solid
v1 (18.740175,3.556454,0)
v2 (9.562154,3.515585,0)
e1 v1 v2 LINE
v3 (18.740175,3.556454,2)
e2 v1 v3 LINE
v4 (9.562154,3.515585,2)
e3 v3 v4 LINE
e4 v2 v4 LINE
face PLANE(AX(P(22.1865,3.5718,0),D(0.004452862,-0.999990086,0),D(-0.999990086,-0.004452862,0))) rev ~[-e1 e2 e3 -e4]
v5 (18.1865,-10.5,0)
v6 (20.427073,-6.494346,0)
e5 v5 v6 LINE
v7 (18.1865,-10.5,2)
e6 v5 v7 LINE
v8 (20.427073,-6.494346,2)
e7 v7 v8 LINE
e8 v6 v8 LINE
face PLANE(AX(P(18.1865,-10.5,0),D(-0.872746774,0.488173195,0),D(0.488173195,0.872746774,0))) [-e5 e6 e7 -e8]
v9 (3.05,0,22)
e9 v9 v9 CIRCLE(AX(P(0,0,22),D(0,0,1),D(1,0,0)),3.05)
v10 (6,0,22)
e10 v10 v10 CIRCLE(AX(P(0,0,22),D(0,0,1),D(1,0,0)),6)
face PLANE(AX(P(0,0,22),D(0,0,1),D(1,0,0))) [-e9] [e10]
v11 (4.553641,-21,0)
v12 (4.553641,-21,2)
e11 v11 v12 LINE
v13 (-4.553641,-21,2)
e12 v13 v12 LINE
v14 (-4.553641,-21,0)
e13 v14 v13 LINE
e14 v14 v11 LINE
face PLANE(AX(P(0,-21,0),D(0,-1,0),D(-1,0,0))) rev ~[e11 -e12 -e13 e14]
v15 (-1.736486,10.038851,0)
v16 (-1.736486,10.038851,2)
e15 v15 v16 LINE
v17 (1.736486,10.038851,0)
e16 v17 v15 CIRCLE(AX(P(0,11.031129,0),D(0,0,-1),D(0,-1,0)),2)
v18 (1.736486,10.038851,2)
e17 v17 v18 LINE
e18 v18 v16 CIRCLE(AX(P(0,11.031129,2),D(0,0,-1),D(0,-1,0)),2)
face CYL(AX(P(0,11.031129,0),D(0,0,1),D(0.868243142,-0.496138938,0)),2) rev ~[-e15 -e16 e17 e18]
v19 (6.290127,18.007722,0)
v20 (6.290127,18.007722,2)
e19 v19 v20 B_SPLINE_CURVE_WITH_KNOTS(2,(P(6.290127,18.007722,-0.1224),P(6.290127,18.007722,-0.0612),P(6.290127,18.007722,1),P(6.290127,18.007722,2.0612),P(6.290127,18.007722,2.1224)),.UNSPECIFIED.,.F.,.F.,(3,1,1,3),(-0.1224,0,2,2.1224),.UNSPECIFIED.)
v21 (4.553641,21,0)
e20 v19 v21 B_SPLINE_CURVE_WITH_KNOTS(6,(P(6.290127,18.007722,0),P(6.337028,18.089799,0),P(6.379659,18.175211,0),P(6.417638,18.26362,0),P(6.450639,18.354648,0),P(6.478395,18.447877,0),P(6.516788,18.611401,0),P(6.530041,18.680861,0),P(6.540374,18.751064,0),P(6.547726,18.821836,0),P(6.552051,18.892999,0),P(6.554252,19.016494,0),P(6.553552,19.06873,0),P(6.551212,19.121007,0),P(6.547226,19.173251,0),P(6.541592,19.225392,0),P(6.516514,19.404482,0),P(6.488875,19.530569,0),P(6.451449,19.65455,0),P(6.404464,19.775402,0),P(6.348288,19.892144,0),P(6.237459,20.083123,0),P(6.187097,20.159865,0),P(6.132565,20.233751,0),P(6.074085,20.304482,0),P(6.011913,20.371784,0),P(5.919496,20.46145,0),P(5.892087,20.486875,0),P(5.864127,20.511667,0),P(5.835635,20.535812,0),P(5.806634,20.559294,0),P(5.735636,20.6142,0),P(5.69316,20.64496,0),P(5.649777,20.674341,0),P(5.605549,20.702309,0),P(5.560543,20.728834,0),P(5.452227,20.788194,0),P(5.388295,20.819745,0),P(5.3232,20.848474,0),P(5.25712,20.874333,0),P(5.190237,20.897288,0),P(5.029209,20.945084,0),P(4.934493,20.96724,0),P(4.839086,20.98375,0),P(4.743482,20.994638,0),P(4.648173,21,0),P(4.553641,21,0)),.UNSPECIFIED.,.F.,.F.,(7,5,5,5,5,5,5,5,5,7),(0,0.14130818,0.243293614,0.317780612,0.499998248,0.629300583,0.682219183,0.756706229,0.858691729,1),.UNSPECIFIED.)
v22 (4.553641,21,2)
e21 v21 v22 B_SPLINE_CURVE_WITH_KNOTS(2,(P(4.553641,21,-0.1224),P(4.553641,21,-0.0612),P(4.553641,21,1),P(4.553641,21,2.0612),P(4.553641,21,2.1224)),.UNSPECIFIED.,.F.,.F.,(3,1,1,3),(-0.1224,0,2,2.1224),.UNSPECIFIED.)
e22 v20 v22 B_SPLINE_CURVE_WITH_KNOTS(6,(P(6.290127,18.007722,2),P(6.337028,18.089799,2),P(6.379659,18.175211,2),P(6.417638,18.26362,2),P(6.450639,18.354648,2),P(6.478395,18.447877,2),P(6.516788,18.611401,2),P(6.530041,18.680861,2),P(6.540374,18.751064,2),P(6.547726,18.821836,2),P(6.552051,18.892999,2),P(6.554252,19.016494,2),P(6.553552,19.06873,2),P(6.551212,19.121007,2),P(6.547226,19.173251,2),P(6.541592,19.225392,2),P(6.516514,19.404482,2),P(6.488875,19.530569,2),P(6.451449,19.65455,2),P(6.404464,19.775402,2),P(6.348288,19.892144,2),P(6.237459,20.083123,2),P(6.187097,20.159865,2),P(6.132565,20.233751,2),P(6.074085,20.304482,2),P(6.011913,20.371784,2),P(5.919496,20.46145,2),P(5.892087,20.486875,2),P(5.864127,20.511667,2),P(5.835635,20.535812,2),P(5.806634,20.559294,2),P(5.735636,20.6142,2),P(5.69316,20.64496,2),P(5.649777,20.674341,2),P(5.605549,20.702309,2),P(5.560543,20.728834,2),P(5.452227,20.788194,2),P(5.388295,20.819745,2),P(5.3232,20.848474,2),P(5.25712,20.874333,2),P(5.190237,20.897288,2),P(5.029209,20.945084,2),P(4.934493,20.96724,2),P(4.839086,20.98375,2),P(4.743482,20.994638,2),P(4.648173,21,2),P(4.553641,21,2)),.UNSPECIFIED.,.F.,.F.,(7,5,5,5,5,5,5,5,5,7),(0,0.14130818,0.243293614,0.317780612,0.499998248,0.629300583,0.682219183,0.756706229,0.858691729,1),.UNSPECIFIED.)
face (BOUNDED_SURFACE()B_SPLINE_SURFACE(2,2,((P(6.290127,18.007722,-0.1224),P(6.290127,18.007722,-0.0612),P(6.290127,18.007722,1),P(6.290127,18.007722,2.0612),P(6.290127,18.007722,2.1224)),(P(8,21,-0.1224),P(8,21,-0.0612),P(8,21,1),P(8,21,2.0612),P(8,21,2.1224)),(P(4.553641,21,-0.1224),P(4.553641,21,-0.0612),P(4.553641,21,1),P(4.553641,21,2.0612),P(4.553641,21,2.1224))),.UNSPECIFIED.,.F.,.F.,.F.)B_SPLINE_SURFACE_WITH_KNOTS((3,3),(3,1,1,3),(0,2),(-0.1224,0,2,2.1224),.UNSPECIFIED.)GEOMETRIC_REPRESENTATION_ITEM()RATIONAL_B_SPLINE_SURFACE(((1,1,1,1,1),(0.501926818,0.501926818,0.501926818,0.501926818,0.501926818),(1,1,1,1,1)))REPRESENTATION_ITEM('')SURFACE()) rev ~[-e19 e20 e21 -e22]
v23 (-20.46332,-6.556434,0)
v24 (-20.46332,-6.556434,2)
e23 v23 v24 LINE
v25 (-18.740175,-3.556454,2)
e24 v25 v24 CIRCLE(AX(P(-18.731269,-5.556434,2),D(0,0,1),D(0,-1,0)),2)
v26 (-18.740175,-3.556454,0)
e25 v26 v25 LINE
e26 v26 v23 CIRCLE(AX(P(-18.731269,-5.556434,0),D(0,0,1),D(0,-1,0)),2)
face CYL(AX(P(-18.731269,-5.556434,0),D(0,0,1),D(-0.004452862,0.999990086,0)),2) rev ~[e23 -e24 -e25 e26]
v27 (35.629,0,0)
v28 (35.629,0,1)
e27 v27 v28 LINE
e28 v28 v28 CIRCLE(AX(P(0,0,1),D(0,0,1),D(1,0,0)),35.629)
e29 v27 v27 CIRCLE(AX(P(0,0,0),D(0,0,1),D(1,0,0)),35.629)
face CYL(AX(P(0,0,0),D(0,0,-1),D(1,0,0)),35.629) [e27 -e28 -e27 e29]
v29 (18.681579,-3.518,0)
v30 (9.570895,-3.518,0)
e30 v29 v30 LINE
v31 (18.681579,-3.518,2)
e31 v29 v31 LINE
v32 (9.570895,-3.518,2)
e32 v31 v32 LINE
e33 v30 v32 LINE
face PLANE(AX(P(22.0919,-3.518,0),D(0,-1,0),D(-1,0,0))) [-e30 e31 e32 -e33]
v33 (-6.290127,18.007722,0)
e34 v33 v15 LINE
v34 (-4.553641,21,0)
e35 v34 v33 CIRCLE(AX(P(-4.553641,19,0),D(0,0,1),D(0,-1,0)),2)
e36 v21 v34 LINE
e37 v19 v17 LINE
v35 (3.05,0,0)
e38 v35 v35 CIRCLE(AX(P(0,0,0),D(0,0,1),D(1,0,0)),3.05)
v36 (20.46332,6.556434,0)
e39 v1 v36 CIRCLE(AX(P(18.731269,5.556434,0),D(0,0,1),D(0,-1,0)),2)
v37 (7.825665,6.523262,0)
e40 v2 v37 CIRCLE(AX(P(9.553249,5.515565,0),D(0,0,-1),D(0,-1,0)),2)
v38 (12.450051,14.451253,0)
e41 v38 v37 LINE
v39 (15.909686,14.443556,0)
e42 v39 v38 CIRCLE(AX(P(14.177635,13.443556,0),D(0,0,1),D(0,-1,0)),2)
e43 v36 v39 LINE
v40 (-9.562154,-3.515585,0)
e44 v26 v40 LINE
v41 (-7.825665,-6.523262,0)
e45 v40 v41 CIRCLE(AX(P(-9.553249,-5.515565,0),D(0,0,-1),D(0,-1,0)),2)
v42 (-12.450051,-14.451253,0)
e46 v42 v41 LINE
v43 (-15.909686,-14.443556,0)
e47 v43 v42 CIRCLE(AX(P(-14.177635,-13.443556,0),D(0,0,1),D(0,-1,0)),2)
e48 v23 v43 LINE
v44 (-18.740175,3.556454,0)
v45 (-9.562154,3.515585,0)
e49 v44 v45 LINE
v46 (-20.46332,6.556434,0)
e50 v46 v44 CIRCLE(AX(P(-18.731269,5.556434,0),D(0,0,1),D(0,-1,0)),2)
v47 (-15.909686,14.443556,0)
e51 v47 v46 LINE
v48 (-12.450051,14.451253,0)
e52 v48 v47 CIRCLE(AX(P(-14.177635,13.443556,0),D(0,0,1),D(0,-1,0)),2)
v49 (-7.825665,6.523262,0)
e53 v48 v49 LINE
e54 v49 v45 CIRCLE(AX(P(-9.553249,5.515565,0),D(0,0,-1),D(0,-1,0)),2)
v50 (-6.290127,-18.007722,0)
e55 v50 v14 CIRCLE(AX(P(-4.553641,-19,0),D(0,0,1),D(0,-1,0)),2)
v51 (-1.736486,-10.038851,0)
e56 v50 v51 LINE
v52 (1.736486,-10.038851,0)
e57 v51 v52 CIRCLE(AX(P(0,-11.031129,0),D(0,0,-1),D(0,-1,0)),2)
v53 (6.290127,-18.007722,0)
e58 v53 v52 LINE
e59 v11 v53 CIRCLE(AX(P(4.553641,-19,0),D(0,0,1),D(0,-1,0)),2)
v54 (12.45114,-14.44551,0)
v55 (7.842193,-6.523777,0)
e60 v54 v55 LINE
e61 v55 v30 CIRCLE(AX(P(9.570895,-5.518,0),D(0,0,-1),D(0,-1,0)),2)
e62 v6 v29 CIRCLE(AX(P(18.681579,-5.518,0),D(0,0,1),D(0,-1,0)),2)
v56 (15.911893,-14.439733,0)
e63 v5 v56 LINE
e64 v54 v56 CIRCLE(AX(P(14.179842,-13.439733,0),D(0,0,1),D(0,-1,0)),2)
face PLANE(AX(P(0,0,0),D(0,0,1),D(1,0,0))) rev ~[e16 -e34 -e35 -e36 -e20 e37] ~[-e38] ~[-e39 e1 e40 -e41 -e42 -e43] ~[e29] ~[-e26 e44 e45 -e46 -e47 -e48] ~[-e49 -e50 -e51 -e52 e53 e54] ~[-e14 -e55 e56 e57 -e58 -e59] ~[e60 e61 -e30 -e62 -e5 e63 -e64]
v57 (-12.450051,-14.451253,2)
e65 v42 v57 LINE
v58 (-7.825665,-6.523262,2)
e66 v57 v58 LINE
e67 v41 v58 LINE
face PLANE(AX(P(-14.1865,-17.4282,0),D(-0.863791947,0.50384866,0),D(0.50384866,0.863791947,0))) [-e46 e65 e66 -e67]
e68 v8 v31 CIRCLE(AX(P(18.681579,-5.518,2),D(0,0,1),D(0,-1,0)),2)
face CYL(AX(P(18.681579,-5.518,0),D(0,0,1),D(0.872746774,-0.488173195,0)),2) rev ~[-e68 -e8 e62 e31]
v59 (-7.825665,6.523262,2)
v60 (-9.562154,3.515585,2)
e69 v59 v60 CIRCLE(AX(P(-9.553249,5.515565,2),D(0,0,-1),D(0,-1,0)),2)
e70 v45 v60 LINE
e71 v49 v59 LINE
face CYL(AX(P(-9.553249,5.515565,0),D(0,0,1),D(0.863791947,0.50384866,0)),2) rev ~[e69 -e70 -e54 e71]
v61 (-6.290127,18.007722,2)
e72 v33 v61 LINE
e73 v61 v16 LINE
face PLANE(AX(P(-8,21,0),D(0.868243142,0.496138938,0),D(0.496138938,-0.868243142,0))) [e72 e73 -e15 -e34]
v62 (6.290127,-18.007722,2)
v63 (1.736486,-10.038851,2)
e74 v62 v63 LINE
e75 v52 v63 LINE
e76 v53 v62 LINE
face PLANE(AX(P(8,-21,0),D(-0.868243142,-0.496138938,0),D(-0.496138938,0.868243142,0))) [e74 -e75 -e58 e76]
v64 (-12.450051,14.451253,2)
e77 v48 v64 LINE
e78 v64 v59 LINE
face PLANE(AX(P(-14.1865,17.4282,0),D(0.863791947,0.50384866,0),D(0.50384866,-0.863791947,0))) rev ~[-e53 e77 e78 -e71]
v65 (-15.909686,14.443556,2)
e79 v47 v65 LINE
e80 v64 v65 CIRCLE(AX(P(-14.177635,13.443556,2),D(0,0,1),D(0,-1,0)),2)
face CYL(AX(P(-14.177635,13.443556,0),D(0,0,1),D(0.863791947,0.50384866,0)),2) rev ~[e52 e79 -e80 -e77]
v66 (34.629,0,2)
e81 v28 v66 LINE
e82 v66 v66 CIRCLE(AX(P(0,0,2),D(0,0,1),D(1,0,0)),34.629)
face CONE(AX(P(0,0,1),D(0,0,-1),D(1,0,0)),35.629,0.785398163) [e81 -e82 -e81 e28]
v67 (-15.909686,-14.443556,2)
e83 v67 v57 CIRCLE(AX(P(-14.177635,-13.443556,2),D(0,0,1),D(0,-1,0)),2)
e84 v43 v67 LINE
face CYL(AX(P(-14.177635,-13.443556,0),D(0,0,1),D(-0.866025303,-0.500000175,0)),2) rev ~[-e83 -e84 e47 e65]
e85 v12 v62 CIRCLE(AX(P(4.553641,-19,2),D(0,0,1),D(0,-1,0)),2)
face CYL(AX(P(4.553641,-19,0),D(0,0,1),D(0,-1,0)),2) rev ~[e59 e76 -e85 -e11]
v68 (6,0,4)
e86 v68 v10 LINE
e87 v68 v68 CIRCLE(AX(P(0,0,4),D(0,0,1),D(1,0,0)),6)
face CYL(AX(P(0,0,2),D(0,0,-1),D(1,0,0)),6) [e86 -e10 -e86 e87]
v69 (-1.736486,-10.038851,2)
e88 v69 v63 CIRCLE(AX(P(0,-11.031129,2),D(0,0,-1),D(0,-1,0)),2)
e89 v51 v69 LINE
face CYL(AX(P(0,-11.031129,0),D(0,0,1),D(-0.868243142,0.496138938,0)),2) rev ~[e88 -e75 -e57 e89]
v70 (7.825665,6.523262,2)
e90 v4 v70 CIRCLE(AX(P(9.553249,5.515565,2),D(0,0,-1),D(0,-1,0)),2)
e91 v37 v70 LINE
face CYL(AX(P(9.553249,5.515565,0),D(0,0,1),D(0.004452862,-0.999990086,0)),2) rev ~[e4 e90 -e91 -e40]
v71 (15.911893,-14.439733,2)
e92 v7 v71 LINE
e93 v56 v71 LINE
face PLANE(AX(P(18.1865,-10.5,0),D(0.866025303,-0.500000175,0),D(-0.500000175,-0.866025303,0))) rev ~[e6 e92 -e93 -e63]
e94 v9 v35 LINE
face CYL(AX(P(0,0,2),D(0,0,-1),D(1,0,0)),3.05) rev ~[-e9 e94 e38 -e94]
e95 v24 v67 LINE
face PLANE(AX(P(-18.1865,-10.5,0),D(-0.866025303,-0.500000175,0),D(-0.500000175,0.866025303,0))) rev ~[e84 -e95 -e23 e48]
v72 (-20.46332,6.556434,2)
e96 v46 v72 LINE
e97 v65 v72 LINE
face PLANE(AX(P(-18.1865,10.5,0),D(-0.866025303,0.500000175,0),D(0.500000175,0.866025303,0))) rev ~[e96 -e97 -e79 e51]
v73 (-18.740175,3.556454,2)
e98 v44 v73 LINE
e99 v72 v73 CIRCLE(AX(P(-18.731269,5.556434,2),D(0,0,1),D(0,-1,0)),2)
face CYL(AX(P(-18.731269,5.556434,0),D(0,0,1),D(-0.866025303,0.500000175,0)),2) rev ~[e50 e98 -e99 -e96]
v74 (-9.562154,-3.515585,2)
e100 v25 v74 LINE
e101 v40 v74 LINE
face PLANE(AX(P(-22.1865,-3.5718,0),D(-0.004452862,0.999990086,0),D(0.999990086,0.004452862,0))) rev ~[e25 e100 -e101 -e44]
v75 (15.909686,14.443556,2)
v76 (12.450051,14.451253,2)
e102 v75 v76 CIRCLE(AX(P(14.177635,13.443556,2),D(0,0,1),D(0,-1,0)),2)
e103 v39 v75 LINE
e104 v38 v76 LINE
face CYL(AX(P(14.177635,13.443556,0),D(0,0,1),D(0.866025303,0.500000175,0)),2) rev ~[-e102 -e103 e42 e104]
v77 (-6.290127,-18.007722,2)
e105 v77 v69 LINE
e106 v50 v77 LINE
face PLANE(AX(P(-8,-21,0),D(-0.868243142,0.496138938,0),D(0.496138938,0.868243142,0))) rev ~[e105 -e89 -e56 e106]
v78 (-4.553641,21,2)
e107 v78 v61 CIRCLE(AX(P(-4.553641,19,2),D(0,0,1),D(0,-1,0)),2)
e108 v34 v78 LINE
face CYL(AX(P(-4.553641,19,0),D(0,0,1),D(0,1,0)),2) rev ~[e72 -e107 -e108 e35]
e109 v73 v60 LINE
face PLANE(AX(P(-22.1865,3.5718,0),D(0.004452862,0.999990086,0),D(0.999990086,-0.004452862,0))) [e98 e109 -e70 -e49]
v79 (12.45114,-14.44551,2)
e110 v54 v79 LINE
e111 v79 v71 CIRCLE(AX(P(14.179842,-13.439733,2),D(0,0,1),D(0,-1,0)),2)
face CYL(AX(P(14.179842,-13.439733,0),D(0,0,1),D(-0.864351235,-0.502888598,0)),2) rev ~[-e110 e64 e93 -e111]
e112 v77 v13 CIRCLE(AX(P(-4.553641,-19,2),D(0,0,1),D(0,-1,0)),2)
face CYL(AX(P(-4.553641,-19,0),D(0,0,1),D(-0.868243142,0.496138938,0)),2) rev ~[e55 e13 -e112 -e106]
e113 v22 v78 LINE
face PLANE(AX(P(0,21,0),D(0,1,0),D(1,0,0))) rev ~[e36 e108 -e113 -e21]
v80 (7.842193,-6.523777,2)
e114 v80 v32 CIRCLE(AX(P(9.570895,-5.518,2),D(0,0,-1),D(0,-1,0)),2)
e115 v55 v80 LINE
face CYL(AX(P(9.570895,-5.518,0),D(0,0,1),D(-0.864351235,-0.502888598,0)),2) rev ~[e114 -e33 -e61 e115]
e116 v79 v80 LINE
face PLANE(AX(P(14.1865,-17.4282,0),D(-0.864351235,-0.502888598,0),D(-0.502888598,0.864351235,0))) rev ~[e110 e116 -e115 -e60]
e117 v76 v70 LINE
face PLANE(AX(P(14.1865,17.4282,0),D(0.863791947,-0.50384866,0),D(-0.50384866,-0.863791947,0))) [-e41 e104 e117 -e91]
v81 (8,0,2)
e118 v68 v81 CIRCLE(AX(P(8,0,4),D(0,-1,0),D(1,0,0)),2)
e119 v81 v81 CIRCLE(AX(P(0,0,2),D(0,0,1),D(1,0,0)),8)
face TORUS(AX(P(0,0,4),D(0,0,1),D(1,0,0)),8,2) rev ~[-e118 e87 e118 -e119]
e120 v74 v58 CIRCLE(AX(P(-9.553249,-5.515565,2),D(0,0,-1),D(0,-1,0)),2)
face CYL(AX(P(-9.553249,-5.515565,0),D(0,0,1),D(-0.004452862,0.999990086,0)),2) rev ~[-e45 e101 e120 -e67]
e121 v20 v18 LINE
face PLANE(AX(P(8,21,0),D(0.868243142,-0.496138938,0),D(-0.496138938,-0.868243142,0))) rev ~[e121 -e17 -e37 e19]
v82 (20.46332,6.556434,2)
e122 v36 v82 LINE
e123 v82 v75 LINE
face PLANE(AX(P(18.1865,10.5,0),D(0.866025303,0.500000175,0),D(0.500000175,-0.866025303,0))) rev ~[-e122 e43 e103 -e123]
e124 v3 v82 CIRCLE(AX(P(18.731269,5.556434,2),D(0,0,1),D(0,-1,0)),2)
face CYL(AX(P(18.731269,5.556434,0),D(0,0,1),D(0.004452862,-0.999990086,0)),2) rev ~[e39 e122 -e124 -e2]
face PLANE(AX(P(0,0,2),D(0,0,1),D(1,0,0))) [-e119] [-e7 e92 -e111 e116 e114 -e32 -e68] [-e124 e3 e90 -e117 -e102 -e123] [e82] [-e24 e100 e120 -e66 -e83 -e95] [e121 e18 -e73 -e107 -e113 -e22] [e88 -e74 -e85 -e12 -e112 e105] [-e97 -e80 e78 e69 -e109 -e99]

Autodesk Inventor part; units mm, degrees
sketch "Sketch1" plane through (0, 0, 0) normal (0, 0, 1) x (1, 0, 0)
  line L0 (0, 2.8582) -> (0, -2.8582) construction
  line L1 (-5.7775, 0) -> (5.7775, 0) construction
  circle A0 centre (0, 0) radius 35.629
  circle A1 centre (0, 0) radius 4
  line L2 (0, 4) -> (0, 7)
  line L3 (0, 7) -> (0, 21)
  line L4 (0, 21) -> (5, 21)
  line L5 (5, 21) -> (8, 21)
  line L6 (8, 21) -> (0, 7)
  line L7 (0, 21) -> (-8, 21)
  line L8 (-8, 21) -> (0, 7)
  line L9 (0, -4) -> (0, -7)
  line L10 (0, -7) -> (0, -21)
  line L11 (0, -21) -> (8, -21)
  line L12 (8, -21) -> (0, -7)
  line L13 (0, -21) -> (-8, -21)
  line L14 (-8, -21) -> (0, -7)
  line L15 (0, 0) -> (2.5981, 1.5)
  line L16 (0, 0) -> (3, 0) construction
  line L17 (2.5981, 1.5) -> (3.4641, 2)
  line L18 (3.4641, 2) -> (6.0622, 3.5)
  line L19 (6.0622, 3.5) -> (18.1865, 10.5)
  line L20 (18.1865, 10.5) -> (14.1865, 17.4282)
  line L21 (14.1865, 17.4282) -> (6.0622, 3.5)
  line L22 (18.1865, 10.5) -> (22.1865, 3.5718)
  line L23 (22.1865, 3.5718) -> (6.0622, 3.5)
  line L24 (0, 0) -> (8, 0) construction
  line L25 (0, 0) -> (3.4641, -2)
  line L26 (0, 0) -> (4, 0) construction
  line L27 (3.4641, -2) -> (6.0622, -3.5)
  line L28 (6.0622, -3.5) -> (18.1865, -10.5)
  line L29 (18.1865, -10.5) -> (14.1865, -17.4282)
  line L30 (14.1865, -17.4282) -> (6.0934, -3.518)
  line L31 (18.1865, -10.5) -> (22.0919, -3.518)
  line L32 (22.0919, -3.518) -> (6.0934, -3.518)
  line L33 (0, 0) -> (-2.5981, 1.5)
  line L34 (0, 0) -> (3, 0) construction
  line L35 (-2.5981, 1.5) -> (-3.4641, 2)
  line L36 (-3.4641, 2) -> (-6.0622, 3.5)
  line L37 (-6.0622, 3.5) -> (-18.1865, 10.5)
  line L38 (-18.1865, 10.5) -> (-14.1865, 17.4282)
  line L39 (-14.1865, 17.4282) -> (-6.0622, 3.5)
  line L40 (-18.1865, 10.5) -> (-22.1865, 3.5718)
  line L41 (-22.1865, 3.5718) -> (-6.0622, 3.5)
  line L42 (0, 0) -> (-6.0622, -3.5)
  line L43 (0, 0) -> (7, 0) construction
  line L44 (-6.0622, -3.5) -> (-18.1865, -10.5)
  line L45 (-18.1865, -10.5) -> (-14.1865, -17.4282)
  line L46 (-14.1865, -17.4282) -> (-6.0622, -3.5)
  line L47 (-18.1865, -10.5) -> (-22.1865, -3.5718)
  line L48 (-22.1865, -3.5718) -> (-6.0622, -3.5)
  dimension "d0" = 71.258
  dimension "d1" = 8
  dimension "d2" = 3
  dimension "d3" = 14
  dimension "d4" = 5
  dimension "d5" = 3
  dimension "d6" = 8
  dimension "d7" = 3
  dimension "d8" = 14
  dimension "d9" = 8
  dimension "d10" = 8
  dimension "d11" = 3
  dimension "d12" = 30
  dimension "d13" = 3
  dimension "d14" = 14
  dimension "d15" = 8
  dimension "d16" = 8
  dimension "d19" = 4
  dimension "d20" = 30
  dimension "d21" = 3
  dimension "d22" = 14
  dimension "d23" = 8
  dimension "d24" = 8
  dimension "d25" = 3
  dimension "d26" = 150
  dimension "d27" = 1
  dimension "d28" = 180
  dimension "d29" = 3
  dimension "d30" = 180
  dimension "d31" = 180
  dimension "d32" = 8
  dimension "d33" = 8
  dimension "d34" = 7
  dimension "d35" = 150
  dimension "d36" = 14
  dimension "d37" = 180
  dimension "d38" = 8
  dimension "d39" = 8
extrude "Extrusion1" add sketch "Sketch1" along normal blind 2
fillet "Fillet1" radius 2 18 edges at (14.1865, 17.4282, 1) (22.1865, 3.5718, 1) (6.0622, 3.5, 1) (22.0919, -3.518, 1) (14.1865, -17.4282, 1) (6.0934, -3.518, 1) (0, 7, 1) (-8, 21, 1) (8, 21, 1) (-6.0622, 3.5, 1) (-22.1865, 3.5718, 1) (-14.1865, 17.4282, 1) (-6.0622, -3.5, 1) (-14.1865, -17.4282, 1) (-22.1865, -3.5718, 1) (-8, -21, 1) (0, -7, 1) (8, -21, 1)
sketch "Sketch2" plane through (0, 0, 2) normal (0, 0, 1) x (1, 0, 0)
  circle A0 centre (0, 0) radius 3.05
  circle A1 centre (0, 0) radius 5
  dimension "d43" = 6.1
  dimension "d49" = 10
extrude "Extrusion2" add sketch "Sketch2" against normal blind 2
chamfer "Chamfer1" distance 1 angle 45 1 edges at (-35.629, 0, 2)
sketch "Sketch4" plane through (0, 0, 2) normal (0, 0, 1) x (1, 0, 0)
  circle A0 centre (0, 0) radius 3.05
  circle A1 centre (0, 0) radius 6
  dimension "d54" = 6.1
  dimension "d55" = 12
extrude "Extrusion4" add sketch "Sketch4" along normal blind 20
fillet "Fillet2" radius 2 1 edges at (-6, 0, 2)
properties part number "Wiel hout+spacer x 20mm" material "S235"
